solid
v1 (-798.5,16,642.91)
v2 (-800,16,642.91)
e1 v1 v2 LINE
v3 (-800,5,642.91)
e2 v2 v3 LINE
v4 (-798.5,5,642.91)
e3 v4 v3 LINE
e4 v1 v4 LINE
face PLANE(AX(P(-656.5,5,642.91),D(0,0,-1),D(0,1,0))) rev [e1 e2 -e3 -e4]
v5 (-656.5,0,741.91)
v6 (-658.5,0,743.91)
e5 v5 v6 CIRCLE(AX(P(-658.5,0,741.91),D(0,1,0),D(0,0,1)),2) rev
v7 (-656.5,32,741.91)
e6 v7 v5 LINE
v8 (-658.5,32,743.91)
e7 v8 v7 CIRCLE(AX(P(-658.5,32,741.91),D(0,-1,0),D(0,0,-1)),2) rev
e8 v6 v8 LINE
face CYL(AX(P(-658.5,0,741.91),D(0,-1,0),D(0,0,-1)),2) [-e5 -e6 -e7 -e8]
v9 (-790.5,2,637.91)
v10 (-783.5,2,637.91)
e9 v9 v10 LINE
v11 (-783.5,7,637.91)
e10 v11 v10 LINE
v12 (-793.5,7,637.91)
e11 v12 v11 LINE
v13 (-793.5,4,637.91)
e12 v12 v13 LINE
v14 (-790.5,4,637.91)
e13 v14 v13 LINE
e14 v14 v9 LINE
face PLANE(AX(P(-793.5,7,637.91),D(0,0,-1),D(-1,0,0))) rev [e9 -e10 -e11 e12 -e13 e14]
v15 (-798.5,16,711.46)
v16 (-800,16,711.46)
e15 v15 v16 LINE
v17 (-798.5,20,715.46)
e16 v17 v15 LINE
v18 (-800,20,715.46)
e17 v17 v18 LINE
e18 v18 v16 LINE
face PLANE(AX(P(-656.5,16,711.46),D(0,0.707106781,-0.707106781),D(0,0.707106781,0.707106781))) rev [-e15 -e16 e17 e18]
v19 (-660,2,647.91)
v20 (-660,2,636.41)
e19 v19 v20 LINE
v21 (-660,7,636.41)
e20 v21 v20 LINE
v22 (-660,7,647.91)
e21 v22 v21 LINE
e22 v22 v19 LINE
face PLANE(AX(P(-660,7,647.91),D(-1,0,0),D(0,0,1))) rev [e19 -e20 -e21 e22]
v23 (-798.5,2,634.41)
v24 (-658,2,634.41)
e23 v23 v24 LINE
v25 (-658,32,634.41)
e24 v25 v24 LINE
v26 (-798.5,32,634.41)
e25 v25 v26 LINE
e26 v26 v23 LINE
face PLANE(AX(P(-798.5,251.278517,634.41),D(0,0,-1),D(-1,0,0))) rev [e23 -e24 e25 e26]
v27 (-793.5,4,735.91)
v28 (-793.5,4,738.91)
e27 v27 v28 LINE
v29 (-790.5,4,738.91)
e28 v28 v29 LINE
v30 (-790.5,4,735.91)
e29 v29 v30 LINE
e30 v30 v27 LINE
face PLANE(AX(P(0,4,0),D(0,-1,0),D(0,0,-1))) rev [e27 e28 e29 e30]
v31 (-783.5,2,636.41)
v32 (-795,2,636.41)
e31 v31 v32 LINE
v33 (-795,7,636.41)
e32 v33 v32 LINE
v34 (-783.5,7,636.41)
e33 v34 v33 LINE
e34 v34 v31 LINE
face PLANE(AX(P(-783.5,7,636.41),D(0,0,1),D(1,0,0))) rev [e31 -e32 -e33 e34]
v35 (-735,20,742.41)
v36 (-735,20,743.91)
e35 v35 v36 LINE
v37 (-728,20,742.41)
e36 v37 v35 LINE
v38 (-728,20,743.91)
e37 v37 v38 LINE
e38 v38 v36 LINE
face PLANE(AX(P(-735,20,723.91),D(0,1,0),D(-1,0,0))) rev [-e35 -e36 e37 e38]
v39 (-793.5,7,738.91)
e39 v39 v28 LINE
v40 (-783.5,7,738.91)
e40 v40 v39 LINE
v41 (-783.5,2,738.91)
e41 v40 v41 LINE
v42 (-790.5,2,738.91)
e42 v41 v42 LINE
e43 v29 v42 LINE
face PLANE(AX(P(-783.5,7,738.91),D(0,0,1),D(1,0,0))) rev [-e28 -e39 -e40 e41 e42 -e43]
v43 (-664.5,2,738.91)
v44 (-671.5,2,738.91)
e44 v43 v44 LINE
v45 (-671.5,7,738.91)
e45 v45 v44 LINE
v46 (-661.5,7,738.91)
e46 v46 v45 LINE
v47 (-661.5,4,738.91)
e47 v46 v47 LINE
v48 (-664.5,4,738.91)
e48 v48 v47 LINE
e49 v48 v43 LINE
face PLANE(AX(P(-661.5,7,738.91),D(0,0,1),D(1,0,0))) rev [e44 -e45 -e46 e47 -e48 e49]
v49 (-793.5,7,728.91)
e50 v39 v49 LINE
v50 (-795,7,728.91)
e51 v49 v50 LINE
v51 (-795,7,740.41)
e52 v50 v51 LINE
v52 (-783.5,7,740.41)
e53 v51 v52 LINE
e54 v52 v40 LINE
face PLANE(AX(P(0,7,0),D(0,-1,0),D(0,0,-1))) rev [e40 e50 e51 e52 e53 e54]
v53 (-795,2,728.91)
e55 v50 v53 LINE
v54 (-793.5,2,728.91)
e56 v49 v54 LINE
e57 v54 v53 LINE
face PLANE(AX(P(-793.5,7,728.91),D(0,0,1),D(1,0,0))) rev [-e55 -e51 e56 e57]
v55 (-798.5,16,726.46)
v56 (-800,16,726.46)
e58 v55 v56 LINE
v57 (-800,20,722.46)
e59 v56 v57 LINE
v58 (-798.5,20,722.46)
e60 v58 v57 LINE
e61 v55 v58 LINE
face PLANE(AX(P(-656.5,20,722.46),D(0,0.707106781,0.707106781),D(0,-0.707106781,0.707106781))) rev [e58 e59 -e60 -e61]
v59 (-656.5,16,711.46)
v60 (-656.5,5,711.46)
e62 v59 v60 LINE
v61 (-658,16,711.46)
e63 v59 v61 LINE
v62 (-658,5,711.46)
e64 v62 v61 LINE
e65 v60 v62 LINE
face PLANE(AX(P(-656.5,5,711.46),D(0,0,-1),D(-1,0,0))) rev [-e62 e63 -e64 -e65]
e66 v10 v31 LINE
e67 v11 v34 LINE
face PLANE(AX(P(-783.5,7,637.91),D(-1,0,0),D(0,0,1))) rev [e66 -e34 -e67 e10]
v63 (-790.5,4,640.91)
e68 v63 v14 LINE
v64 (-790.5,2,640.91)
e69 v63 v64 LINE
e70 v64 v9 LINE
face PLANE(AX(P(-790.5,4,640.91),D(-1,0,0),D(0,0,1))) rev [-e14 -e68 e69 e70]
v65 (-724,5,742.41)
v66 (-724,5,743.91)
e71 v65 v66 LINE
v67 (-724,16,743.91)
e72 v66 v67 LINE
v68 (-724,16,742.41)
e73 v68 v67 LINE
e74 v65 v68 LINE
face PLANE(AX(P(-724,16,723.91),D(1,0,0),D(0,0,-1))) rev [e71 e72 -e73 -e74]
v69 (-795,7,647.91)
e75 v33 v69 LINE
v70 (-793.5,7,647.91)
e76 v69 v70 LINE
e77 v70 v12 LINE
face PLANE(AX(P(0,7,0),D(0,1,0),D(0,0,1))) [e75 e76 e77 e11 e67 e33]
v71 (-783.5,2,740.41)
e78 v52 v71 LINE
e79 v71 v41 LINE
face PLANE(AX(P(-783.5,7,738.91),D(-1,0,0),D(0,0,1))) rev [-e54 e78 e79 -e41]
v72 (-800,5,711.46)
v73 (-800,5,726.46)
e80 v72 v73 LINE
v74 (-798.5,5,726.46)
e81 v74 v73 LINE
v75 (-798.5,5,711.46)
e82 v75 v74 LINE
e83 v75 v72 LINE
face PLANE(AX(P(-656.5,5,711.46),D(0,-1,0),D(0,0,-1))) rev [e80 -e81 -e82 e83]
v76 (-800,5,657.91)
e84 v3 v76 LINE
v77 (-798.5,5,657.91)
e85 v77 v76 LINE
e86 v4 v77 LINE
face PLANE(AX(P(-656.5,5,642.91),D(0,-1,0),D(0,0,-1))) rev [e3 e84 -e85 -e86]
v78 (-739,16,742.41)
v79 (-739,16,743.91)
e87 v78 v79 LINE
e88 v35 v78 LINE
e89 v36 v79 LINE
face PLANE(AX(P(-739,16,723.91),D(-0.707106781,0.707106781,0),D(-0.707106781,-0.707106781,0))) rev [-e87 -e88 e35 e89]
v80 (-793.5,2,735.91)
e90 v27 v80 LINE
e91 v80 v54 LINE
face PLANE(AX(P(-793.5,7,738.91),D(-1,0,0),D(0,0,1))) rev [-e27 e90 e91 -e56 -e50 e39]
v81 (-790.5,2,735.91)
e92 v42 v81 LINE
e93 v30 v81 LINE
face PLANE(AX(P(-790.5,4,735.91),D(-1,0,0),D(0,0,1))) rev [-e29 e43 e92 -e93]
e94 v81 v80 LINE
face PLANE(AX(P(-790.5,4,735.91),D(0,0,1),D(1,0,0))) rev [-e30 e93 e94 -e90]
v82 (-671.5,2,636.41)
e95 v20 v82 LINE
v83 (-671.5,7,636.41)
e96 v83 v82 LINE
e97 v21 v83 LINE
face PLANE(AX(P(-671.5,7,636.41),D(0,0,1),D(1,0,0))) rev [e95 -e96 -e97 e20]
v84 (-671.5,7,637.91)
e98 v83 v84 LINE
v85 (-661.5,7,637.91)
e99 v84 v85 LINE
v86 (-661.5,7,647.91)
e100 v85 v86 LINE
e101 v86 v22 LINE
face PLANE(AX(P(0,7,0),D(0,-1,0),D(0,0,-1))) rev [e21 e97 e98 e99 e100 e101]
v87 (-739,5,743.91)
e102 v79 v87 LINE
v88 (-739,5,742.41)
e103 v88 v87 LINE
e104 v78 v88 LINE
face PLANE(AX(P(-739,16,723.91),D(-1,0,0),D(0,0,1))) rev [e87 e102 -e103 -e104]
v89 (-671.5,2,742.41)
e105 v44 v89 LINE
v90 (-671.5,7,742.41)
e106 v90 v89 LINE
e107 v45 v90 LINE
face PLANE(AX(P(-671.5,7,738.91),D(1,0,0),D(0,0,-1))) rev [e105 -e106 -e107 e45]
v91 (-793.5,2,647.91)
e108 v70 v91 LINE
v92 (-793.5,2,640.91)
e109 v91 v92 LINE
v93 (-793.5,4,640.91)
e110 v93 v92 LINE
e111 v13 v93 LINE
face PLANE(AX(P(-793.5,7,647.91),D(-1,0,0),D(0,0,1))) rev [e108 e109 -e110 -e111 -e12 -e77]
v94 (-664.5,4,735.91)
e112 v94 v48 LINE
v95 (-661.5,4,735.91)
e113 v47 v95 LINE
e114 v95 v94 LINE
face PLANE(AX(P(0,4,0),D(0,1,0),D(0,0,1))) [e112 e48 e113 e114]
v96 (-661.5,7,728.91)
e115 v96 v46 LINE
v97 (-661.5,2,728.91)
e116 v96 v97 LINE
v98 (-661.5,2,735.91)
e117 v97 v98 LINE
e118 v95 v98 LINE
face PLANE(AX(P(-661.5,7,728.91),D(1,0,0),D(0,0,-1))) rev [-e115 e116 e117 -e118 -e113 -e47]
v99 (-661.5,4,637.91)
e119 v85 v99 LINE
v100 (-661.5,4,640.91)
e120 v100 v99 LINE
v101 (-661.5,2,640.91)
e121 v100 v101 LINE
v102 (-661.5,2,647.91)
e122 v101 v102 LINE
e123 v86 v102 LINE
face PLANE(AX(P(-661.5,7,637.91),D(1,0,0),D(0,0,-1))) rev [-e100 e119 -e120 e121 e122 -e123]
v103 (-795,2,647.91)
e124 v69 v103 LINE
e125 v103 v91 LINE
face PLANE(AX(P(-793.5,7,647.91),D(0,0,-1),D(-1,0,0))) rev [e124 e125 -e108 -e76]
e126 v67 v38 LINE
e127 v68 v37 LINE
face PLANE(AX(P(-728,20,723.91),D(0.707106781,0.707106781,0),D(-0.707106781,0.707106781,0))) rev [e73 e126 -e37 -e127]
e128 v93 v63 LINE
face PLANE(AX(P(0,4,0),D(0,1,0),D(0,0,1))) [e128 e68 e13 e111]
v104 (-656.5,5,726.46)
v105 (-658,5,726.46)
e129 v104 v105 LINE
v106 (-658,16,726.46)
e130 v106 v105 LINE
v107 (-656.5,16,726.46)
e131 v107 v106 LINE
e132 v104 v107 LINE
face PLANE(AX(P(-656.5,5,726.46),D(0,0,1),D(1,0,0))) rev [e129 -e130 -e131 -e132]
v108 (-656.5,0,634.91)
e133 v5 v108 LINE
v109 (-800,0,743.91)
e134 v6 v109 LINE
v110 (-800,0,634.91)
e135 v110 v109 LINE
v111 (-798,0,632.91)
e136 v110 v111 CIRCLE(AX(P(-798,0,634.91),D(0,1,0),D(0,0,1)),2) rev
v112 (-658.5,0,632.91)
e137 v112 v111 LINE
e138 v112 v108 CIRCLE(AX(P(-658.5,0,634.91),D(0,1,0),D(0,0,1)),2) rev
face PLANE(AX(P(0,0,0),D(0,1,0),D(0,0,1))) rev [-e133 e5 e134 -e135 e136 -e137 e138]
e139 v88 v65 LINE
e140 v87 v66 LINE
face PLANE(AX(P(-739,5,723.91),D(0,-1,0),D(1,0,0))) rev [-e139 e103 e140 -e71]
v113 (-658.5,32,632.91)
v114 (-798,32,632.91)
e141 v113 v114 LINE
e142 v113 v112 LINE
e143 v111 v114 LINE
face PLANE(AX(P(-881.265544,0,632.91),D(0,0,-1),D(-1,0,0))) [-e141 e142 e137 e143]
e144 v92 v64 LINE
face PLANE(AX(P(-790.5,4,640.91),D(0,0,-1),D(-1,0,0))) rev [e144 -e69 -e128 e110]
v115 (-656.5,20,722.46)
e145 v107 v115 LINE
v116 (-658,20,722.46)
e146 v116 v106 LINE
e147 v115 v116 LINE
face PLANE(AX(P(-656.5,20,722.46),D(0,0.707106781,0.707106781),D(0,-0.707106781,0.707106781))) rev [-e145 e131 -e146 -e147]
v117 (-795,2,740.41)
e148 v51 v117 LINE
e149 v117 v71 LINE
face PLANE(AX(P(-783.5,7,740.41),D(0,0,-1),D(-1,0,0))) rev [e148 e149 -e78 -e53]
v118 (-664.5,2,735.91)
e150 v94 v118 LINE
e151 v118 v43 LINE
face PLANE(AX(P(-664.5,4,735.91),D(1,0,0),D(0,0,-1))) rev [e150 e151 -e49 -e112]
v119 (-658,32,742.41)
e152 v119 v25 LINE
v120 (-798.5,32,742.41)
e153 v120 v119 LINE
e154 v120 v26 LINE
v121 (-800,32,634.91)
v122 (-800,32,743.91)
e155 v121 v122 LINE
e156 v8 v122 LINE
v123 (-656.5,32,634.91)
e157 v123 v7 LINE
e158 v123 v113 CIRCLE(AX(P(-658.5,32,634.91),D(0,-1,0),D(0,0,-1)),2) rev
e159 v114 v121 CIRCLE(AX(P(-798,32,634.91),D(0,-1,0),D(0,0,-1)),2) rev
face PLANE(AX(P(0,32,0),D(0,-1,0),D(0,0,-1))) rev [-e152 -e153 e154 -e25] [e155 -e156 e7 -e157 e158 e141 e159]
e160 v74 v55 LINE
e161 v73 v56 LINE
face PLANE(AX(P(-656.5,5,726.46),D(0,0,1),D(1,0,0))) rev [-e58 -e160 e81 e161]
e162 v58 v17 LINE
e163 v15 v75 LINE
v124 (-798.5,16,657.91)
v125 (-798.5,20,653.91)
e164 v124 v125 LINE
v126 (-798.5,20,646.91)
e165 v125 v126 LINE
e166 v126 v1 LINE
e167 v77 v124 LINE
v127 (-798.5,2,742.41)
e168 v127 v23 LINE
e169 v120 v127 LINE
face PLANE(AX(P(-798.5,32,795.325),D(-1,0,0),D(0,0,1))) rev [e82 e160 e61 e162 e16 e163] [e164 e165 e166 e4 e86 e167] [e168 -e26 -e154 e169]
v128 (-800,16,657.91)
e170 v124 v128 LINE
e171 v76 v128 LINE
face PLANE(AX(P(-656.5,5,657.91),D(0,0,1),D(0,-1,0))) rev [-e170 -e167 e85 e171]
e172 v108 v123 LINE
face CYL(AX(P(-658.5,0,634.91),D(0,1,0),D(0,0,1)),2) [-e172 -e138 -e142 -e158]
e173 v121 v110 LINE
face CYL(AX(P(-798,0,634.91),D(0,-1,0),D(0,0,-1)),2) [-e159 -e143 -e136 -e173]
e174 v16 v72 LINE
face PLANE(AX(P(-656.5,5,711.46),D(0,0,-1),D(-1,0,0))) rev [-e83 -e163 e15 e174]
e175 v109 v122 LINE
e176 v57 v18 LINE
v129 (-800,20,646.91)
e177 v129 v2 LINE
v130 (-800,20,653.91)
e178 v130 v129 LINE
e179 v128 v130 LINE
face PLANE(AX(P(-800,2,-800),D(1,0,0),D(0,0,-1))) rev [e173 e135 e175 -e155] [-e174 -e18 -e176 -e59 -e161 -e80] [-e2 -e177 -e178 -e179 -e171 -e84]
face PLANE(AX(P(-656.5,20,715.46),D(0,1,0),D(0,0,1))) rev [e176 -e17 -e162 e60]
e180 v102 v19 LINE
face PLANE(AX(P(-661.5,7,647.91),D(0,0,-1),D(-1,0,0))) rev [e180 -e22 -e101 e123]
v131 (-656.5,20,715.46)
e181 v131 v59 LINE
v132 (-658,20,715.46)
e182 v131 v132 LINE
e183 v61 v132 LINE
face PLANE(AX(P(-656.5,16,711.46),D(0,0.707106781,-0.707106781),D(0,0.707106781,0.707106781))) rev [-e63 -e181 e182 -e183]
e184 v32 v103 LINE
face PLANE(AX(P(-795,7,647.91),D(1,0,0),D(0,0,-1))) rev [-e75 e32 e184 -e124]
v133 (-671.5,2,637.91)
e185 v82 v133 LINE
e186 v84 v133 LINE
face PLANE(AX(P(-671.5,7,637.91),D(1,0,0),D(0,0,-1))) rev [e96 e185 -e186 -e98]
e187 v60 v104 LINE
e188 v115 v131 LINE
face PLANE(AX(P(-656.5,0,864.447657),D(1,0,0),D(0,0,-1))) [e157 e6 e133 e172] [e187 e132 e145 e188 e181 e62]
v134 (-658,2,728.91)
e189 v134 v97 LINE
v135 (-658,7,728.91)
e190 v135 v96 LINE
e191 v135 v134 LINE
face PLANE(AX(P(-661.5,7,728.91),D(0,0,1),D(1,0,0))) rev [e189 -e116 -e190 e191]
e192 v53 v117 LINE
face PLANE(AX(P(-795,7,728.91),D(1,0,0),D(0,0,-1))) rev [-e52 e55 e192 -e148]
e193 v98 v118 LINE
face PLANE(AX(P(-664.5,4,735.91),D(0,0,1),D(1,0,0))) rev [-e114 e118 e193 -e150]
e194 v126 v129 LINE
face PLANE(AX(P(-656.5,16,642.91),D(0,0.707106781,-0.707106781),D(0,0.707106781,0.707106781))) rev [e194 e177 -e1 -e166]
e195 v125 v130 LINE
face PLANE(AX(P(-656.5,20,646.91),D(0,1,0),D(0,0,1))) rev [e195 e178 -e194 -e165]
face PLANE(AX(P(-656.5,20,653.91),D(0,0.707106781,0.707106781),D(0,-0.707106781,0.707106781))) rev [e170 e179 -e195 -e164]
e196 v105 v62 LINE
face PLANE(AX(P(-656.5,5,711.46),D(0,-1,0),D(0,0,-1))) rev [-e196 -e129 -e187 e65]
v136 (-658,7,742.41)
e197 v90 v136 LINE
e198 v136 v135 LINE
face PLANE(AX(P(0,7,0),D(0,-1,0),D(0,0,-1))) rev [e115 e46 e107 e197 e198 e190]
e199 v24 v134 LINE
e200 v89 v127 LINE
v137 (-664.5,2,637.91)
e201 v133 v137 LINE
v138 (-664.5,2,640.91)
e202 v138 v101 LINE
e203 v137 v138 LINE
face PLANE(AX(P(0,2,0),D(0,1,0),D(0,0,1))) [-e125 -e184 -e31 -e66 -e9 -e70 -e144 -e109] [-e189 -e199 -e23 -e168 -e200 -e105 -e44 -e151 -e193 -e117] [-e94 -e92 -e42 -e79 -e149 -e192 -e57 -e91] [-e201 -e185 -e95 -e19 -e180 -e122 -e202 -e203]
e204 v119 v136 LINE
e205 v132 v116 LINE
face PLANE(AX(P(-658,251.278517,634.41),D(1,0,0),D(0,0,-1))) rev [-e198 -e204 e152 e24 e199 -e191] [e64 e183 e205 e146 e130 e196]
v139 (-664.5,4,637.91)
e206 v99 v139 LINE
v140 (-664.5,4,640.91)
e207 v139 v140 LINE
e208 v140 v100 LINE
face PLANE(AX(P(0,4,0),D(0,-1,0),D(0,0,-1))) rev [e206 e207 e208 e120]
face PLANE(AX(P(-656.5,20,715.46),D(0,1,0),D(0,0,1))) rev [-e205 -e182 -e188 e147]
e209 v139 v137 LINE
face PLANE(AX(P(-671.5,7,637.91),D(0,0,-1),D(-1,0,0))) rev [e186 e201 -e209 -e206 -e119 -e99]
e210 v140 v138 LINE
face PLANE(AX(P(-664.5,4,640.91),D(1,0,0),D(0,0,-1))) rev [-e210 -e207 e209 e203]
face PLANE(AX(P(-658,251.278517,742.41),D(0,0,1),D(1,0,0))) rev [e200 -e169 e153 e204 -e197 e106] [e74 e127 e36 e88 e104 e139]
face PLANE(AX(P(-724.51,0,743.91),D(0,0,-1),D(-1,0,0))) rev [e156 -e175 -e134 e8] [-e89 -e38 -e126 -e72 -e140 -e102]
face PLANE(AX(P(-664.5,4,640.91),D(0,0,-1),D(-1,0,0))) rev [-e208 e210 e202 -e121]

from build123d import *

# Parameters (mm, degrees)
SKETCH1_W                = 1600
SKETCH1_H                = 1600
BOSS_EXTRUDE1_DEPTH      = 2
SKETCH2_R                = 1.585
BOSS_EXTRUDE2_DEPTH      = 5
SKETCH3_W                = 1.5
SKETCH3_H                = 10.8
SKETCH3_H_2              = 16.825
BOSS_EXTRUDE3_DEPTH      = 30
CUT_EXTRUDE1_DEPTH       = 1132.768527571
CUT_EXTRUDE1_DEPTH_BACK  = 1132.768527571
SKETCH5_OUTSIDE_W        = 2054.594
SKETCH5_OUTSIDE_H        = 2054.594
SKETCH5_OUTSIDE_W_2      = 200
SKETCH5_OUTSIDE_H_2      = 200
SKETCH6_W                = 200
SKETCH6_H                = 97
BOSS_EXTRUDE4_DEPTH      = 2
BOSS_EXTRUDE6_DEPTH      = 30
CUT_EXTRUDE7_START       = -2
CUT_EXTRUDE7_DEPTH       = 32
SKETCH15_W               = 48.54
SKETCH15_H               = 10.95
BOSS_EXTRUDE8_DEPTH      = 1.5
CHAMFER1_SIZE            = 3
CUT_EXTRUDE9_DEPTH       = 1132.768527571
CUT_EXTRUDE9_DEPTH_BACK  = 1132.768527571
SKETCH16_W               = 83.170959918
SKETCH16_H               = 74.318470717
BOSS_EXTRUDE9_DEPTH      = 30
CUT_EXTRUDE8_DEPTH       = 814.397965328
CUT_EXTRUDE8_DEPTH_BACK  = 814.397965328
SKETCH18_W               = 20.53541424
SKETCH18_H               = 18.617271152
BOSS_EXTRUDE10_DEPTH     = 1.5
BOSS_EXTRUDE11_DEPTH     = 5
SKETCH20_W               = 3
SKETCH20_H               = 3
BOSS_EXTRUDE12_DEPTH     = 2
FILLET1_R                = 2
BOSS_EXTRUDE13_DEPTH     = 30
CUT_EXTRUDE10_DEPTH      = 1132.823307765
CUT_EXTRUDE10_DEPTH_BACK = 1132.823307765
SKETCH22_W               = 118.842145749
SKETCH22_H               = 72.51699158
CUT_EXTRUDE11_DEPTH      = 20


# Read off the part's stored shape, not the designer's step: Cut-Extrude7
with BuildPart() as part:
    # Sketch1 → Boss-Extrude1 (new body)
    with BuildSketch(Plane(origin=(0, 0, 0), x_dir=(1, 0, 0), z_dir=(0, 1, 0))):
        Rectangle(SKETCH1_W, SKETCH1_H)
    extrude(amount=BOSS_EXTRUDE1_DEPTH)

    # Sketch2 → Boss-Extrude2 (add)
    with BuildSketch(Plane(origin=(0, 2, 0), x_dir=(1, 0, 0), z_dir=(0, 1, 0))):
        with Locations(Location((-782.85, -746.2, 0), (0, 0, 270))):
            Circle(SKETCH2_R)
        with Locations(Location((-732.05, -761.44, 0), (0, 0, 270))):
            Circle(SKETCH2_R)
        with Locations(Location((-784.12, -794.46, 0), (0, 0, 270))):
            Circle(SKETCH2_R)
        with Locations(Location((-732.05, -789.38, 0), (0, 0, 270))):
            Circle(SKETCH2_R)
    extrude(amount=BOSS_EXTRUDE2_DEPTH)

    # Sketch3 → Boss-Extrude3 (add)
    with BuildSketch(Plane(origin=(0, 2, 0), x_dir=(1, 0, 0), z_dir=(0, 1, 0))):
        with Locations((-799.25, -746.06)):
            Rectangle(SKETCH3_W, SKETCH3_H)
        Polygon((-798.5, -800), (-800, -800), (-800, -795.325), (-798.5, -795.325), (-798.5, -798.5), (-648.5, -798.5), (-648.5, -800), align=None)
        with Locations((-799.25, -774.9125)):
            Rectangle(SKETCH3_W, SKETCH3_H_2)
    extrude(amount=BOSS_EXTRUDE3_DEPTH)

    # Sketch5 outside → Cut-Extrude1 (cut, two sides: drawn at the far end of the back side and taken through both)
    with BuildSketch(Plane(origin=(0, 2, 0), x_dir=(1, 0, 0), z_dir=(0, 1, 0)).offset(-CUT_EXTRUDE1_DEPTH_BACK)):
        Rectangle(SKETCH5_OUTSIDE_W, SKETCH5_OUTSIDE_H)
        with Locations((-700, -700)):
            Rectangle(SKETCH5_OUTSIDE_W_2, SKETCH5_OUTSIDE_H_2, mode=Mode.SUBTRACT)
    extrude(amount=CUT_EXTRUDE1_DEPTH + CUT_EXTRUDE1_DEPTH_BACK, mode=Mode.SUBTRACT)

    # Sketch6 → Boss-Extrude4 (add)
    with BuildSketch(Plane(origin=(0, 2, 0), x_dir=(1, 0, 0), z_dir=(0, 1, 0))):
        with Locations((-698.5, -652.5)):
            Rectangle(SKETCH6_W, SKETCH6_H)
    extrude(amount=-BOSS_EXTRUDE4_DEPTH)

    # Sketch7 → Boss-Extrude6 (add)
    with BuildSketch(Plane(origin=(0, 2, 0), x_dir=(1, 0, 0), z_dir=(0, 1, 0))):
        Polygon((-798.5, -740.66), (-798.5, -601.5), (-601.5, -601.5), (-601.5, -605.5), (-600, -605.5), (-600, -699.5), (-601.5, -699.5), (-601.5, -798.5), (-648.5, -798.5), (-648.5, -800), (-600, -800), (-600, -701), (-598.5, -701), (-598.5, -604), (-600, -604), (-600, -600), (-800, -600), (-800, -740.66), align=None)
    extrude(amount=BOSS_EXTRUDE6_DEPTH)

    # Cut-Extrude7 outline → Cut-Extrude7 (cut)
    with BuildSketch(Plane(origin=(0, 2, 0), x_dir=(1, 0, 0), z_dir=(0, 1, 0)).offset(CUT_EXTRUDE7_START)):
        Polygon((-656.5, -632.91), (-656.5, -800), (-600, -800), (-600, -701), (-598.5, -701), (-598.5, -604), (-600, -604), (-600, -600), (-800, -600), (-800, -632.91), align=None)
    extrude(amount=CUT_EXTRUDE7_DEPTH, mode=Mode.SUBTRACT)

    # Sketch15 → Boss-Extrude8 (add)
    with BuildSketch(Plane.ZY.offset(800)):
        with Locations((775.73, 26.525)):
            Rectangle(SKETCH15_W, SKETCH15_H)
    extrude(amount=-BOSS_EXTRUDE8_DEPTH)

    # Chamfer1
    chamfer1_edges = [part.edges().sort_by_distance(p)[0] for p in [
        (-799.25, 21.05, 766.5),
        (-799.25, 21.05, 795.325),
        (-799.25, 21.05, 751.46),
        (-799.25, 21.05, 783.325),
    ]]
    chamfer(chamfer1_edges, length=CHAMFER1_SIZE)

    # Sketch16 → Cut-Extrude9 (cut, two sides: drawn at the far end of the back side and taken through both)
    with BuildSketch(Plane(origin=(0, 2, 0), x_dir=(1, 0, 0), z_dir=(0, 1, 0)).offset(-CUT_EXTRUDE9_DEPTH_BACK)):
        with Locations((-682.924520041, -781.069235359)):
            Rectangle(SKETCH16_W, SKETCH16_H)
    extrude(amount=CUT_EXTRUDE9_DEPTH + CUT_EXTRUDE9_DEPTH_BACK, mode=Mode.SUBTRACT)

    # Sketch17 → Boss-Extrude9 (add)
    with BuildSketch(Plane(origin=(0, 2, 0), x_dir=(1, 0, 0), z_dir=(0, 1, 0))):
        Polygon((-798.5, -632.91), (-656.5, -632.91), (-656.5, -743.91), (-724.51, -743.91), (-724.51, -800), (-726.01, -800), (-726.01, -742.41), (-658, -742.41), (-658, -634.41), (-798.5, -634.41), align=None)
    extrude(amount=BOSS_EXTRUDE9_DEPTH)

    # Sketch14 → Cut-Extrude8 (cut, two sides: drawn at the far end of the back side and taken through both)
    with BuildSketch(Plane.ZY.offset(800).offset(-CUT_EXTRUDE8_DEPTH_BACK)):
        Polygon((642.91, 5), (657.91, 5), (657.91, 16), (653.91, 20), (646.91, 20), (642.91, 16), align=None)
        Polygon((711.46, 5), (726.46, 5), (726.46, 16), (722.46, 20), (715.46, 20), (711.46, 16), align=None)
    extrude(amount=CUT_EXTRUDE8_DEPTH + CUT_EXTRUDE8_DEPTH_BACK, mode=Mode.SUBTRACT)

    # Sketch18 → Boss-Extrude10 (add)
    with BuildSketch(Plane(origin=(-656.5, 0, 0), x_dir=(0, 0, -1), z_dir=(1, 0, 0))):
        with Locations((-651.07097558, 11.926550953)):
            Rectangle(SKETCH18_W, SKETCH18_H)
    extrude(amount=-BOSS_EXTRUDE10_DEPTH)

    # Sketch19 → Boss-Extrude11 (add)
    with BuildSketch(Plane(origin=(0, 2, 0), x_dir=(1, 0, 0), z_dir=(0, 1, 0))):
        Polygon((-793.5, -647.91), (-795, -647.91), (-795, -636.41), (-783.5, -636.41), (-783.5, -637.91), (-793.5, -637.91), align=None)
        Polygon((-661.5, -647.91), (-660, -647.91), (-660, -636.41), (-671.5, -636.41), (-671.5, -637.91), (-661.5, -637.91), align=None)
        Polygon((-661.5, -728.91), (-658, -728.91), (-658, -742.41), (-671.5, -742.41), (-671.5, -738.91), (-661.5, -738.91), align=None)
        Polygon((-793.5, -728.91), (-795, -728.91), (-795, -740.41), (-783.5, -740.41), (-783.5, -738.91), (-793.5, -738.91), align=None)
    extrude(amount=BOSS_EXTRUDE11_DEPTH)

    # Sketch20 → Boss-Extrude12 (add)
    with BuildSketch(Plane(origin=(0, 2, 0), x_dir=(1, 0, 0), z_dir=(0, 1, 0))):
        with Locations((-792, -639.41)):
            Rectangle(SKETCH20_W, SKETCH20_H)
        with Locations((-663, -639.41)):
            Rectangle(SKETCH20_W, SKETCH20_H)
        with Locations((-663, -737.41)):
            Rectangle(SKETCH20_W, SKETCH20_H)
        with Locations((-792, -737.41)):
            Rectangle(SKETCH20_W, SKETCH20_H)
    extrude(amount=BOSS_EXTRUDE12_DEPTH)

    # Fillet1
    fillet1_edges = [part.edges().sort_by_distance(p)[0] for p in [
        (-656.5, 16, 632.91),
        (-800, 16, 632.91),
        (-656.5, 16, 743.91),
        (-724.51, 16, 800),
        (-724.51, 16, 743.91),
        (-800, 16, 800),
    ]]
    fillet(fillet1_edges, radius=FILLET1_R)

    # Sketch21 → Boss-Extrude13 (add)
    with BuildSketch(Plane(origin=(0, 2, 0), x_dir=(1, 0, 0), z_dir=(0, 1, 0))):
        Polygon((-726.01, -742.41), (-798.5, -742.41), (-800, -743.91), (-720.182968703, -743.91), align=None)
    extrude(amount=BOSS_EXTRUDE13_DEPTH)

    # Sketch22 → Cut-Extrude10 (cut, two sides: drawn at the far end of the back side and taken through both)
    with BuildSketch(Plane(origin=(0, 32, 0), x_dir=(1, 0, 0), z_dir=(0, 1, 0)).offset(-CUT_EXTRUDE10_DEPTH_BACK)):
        with Locations((-761.569685202, -780.16849579)):
            Rectangle(SKETCH22_W, SKETCH22_H)
    extrude(amount=CUT_EXTRUDE10_DEPTH + CUT_EXTRUDE10_DEPTH_BACK, mode=Mode.SUBTRACT)

    # Sketch23 → Cut-Extrude11 (cut)
    with BuildSketch(Plane.XY.offset(743.91)):
        Polygon((-735, 20), (-728, 20), (-724, 16), (-724, 5), (-739, 5), (-739, 16), align=None)
    extrude(amount=-CUT_EXTRUDE11_DEPTH, mode=Mode.SUBTRACT)


solid = part.part
